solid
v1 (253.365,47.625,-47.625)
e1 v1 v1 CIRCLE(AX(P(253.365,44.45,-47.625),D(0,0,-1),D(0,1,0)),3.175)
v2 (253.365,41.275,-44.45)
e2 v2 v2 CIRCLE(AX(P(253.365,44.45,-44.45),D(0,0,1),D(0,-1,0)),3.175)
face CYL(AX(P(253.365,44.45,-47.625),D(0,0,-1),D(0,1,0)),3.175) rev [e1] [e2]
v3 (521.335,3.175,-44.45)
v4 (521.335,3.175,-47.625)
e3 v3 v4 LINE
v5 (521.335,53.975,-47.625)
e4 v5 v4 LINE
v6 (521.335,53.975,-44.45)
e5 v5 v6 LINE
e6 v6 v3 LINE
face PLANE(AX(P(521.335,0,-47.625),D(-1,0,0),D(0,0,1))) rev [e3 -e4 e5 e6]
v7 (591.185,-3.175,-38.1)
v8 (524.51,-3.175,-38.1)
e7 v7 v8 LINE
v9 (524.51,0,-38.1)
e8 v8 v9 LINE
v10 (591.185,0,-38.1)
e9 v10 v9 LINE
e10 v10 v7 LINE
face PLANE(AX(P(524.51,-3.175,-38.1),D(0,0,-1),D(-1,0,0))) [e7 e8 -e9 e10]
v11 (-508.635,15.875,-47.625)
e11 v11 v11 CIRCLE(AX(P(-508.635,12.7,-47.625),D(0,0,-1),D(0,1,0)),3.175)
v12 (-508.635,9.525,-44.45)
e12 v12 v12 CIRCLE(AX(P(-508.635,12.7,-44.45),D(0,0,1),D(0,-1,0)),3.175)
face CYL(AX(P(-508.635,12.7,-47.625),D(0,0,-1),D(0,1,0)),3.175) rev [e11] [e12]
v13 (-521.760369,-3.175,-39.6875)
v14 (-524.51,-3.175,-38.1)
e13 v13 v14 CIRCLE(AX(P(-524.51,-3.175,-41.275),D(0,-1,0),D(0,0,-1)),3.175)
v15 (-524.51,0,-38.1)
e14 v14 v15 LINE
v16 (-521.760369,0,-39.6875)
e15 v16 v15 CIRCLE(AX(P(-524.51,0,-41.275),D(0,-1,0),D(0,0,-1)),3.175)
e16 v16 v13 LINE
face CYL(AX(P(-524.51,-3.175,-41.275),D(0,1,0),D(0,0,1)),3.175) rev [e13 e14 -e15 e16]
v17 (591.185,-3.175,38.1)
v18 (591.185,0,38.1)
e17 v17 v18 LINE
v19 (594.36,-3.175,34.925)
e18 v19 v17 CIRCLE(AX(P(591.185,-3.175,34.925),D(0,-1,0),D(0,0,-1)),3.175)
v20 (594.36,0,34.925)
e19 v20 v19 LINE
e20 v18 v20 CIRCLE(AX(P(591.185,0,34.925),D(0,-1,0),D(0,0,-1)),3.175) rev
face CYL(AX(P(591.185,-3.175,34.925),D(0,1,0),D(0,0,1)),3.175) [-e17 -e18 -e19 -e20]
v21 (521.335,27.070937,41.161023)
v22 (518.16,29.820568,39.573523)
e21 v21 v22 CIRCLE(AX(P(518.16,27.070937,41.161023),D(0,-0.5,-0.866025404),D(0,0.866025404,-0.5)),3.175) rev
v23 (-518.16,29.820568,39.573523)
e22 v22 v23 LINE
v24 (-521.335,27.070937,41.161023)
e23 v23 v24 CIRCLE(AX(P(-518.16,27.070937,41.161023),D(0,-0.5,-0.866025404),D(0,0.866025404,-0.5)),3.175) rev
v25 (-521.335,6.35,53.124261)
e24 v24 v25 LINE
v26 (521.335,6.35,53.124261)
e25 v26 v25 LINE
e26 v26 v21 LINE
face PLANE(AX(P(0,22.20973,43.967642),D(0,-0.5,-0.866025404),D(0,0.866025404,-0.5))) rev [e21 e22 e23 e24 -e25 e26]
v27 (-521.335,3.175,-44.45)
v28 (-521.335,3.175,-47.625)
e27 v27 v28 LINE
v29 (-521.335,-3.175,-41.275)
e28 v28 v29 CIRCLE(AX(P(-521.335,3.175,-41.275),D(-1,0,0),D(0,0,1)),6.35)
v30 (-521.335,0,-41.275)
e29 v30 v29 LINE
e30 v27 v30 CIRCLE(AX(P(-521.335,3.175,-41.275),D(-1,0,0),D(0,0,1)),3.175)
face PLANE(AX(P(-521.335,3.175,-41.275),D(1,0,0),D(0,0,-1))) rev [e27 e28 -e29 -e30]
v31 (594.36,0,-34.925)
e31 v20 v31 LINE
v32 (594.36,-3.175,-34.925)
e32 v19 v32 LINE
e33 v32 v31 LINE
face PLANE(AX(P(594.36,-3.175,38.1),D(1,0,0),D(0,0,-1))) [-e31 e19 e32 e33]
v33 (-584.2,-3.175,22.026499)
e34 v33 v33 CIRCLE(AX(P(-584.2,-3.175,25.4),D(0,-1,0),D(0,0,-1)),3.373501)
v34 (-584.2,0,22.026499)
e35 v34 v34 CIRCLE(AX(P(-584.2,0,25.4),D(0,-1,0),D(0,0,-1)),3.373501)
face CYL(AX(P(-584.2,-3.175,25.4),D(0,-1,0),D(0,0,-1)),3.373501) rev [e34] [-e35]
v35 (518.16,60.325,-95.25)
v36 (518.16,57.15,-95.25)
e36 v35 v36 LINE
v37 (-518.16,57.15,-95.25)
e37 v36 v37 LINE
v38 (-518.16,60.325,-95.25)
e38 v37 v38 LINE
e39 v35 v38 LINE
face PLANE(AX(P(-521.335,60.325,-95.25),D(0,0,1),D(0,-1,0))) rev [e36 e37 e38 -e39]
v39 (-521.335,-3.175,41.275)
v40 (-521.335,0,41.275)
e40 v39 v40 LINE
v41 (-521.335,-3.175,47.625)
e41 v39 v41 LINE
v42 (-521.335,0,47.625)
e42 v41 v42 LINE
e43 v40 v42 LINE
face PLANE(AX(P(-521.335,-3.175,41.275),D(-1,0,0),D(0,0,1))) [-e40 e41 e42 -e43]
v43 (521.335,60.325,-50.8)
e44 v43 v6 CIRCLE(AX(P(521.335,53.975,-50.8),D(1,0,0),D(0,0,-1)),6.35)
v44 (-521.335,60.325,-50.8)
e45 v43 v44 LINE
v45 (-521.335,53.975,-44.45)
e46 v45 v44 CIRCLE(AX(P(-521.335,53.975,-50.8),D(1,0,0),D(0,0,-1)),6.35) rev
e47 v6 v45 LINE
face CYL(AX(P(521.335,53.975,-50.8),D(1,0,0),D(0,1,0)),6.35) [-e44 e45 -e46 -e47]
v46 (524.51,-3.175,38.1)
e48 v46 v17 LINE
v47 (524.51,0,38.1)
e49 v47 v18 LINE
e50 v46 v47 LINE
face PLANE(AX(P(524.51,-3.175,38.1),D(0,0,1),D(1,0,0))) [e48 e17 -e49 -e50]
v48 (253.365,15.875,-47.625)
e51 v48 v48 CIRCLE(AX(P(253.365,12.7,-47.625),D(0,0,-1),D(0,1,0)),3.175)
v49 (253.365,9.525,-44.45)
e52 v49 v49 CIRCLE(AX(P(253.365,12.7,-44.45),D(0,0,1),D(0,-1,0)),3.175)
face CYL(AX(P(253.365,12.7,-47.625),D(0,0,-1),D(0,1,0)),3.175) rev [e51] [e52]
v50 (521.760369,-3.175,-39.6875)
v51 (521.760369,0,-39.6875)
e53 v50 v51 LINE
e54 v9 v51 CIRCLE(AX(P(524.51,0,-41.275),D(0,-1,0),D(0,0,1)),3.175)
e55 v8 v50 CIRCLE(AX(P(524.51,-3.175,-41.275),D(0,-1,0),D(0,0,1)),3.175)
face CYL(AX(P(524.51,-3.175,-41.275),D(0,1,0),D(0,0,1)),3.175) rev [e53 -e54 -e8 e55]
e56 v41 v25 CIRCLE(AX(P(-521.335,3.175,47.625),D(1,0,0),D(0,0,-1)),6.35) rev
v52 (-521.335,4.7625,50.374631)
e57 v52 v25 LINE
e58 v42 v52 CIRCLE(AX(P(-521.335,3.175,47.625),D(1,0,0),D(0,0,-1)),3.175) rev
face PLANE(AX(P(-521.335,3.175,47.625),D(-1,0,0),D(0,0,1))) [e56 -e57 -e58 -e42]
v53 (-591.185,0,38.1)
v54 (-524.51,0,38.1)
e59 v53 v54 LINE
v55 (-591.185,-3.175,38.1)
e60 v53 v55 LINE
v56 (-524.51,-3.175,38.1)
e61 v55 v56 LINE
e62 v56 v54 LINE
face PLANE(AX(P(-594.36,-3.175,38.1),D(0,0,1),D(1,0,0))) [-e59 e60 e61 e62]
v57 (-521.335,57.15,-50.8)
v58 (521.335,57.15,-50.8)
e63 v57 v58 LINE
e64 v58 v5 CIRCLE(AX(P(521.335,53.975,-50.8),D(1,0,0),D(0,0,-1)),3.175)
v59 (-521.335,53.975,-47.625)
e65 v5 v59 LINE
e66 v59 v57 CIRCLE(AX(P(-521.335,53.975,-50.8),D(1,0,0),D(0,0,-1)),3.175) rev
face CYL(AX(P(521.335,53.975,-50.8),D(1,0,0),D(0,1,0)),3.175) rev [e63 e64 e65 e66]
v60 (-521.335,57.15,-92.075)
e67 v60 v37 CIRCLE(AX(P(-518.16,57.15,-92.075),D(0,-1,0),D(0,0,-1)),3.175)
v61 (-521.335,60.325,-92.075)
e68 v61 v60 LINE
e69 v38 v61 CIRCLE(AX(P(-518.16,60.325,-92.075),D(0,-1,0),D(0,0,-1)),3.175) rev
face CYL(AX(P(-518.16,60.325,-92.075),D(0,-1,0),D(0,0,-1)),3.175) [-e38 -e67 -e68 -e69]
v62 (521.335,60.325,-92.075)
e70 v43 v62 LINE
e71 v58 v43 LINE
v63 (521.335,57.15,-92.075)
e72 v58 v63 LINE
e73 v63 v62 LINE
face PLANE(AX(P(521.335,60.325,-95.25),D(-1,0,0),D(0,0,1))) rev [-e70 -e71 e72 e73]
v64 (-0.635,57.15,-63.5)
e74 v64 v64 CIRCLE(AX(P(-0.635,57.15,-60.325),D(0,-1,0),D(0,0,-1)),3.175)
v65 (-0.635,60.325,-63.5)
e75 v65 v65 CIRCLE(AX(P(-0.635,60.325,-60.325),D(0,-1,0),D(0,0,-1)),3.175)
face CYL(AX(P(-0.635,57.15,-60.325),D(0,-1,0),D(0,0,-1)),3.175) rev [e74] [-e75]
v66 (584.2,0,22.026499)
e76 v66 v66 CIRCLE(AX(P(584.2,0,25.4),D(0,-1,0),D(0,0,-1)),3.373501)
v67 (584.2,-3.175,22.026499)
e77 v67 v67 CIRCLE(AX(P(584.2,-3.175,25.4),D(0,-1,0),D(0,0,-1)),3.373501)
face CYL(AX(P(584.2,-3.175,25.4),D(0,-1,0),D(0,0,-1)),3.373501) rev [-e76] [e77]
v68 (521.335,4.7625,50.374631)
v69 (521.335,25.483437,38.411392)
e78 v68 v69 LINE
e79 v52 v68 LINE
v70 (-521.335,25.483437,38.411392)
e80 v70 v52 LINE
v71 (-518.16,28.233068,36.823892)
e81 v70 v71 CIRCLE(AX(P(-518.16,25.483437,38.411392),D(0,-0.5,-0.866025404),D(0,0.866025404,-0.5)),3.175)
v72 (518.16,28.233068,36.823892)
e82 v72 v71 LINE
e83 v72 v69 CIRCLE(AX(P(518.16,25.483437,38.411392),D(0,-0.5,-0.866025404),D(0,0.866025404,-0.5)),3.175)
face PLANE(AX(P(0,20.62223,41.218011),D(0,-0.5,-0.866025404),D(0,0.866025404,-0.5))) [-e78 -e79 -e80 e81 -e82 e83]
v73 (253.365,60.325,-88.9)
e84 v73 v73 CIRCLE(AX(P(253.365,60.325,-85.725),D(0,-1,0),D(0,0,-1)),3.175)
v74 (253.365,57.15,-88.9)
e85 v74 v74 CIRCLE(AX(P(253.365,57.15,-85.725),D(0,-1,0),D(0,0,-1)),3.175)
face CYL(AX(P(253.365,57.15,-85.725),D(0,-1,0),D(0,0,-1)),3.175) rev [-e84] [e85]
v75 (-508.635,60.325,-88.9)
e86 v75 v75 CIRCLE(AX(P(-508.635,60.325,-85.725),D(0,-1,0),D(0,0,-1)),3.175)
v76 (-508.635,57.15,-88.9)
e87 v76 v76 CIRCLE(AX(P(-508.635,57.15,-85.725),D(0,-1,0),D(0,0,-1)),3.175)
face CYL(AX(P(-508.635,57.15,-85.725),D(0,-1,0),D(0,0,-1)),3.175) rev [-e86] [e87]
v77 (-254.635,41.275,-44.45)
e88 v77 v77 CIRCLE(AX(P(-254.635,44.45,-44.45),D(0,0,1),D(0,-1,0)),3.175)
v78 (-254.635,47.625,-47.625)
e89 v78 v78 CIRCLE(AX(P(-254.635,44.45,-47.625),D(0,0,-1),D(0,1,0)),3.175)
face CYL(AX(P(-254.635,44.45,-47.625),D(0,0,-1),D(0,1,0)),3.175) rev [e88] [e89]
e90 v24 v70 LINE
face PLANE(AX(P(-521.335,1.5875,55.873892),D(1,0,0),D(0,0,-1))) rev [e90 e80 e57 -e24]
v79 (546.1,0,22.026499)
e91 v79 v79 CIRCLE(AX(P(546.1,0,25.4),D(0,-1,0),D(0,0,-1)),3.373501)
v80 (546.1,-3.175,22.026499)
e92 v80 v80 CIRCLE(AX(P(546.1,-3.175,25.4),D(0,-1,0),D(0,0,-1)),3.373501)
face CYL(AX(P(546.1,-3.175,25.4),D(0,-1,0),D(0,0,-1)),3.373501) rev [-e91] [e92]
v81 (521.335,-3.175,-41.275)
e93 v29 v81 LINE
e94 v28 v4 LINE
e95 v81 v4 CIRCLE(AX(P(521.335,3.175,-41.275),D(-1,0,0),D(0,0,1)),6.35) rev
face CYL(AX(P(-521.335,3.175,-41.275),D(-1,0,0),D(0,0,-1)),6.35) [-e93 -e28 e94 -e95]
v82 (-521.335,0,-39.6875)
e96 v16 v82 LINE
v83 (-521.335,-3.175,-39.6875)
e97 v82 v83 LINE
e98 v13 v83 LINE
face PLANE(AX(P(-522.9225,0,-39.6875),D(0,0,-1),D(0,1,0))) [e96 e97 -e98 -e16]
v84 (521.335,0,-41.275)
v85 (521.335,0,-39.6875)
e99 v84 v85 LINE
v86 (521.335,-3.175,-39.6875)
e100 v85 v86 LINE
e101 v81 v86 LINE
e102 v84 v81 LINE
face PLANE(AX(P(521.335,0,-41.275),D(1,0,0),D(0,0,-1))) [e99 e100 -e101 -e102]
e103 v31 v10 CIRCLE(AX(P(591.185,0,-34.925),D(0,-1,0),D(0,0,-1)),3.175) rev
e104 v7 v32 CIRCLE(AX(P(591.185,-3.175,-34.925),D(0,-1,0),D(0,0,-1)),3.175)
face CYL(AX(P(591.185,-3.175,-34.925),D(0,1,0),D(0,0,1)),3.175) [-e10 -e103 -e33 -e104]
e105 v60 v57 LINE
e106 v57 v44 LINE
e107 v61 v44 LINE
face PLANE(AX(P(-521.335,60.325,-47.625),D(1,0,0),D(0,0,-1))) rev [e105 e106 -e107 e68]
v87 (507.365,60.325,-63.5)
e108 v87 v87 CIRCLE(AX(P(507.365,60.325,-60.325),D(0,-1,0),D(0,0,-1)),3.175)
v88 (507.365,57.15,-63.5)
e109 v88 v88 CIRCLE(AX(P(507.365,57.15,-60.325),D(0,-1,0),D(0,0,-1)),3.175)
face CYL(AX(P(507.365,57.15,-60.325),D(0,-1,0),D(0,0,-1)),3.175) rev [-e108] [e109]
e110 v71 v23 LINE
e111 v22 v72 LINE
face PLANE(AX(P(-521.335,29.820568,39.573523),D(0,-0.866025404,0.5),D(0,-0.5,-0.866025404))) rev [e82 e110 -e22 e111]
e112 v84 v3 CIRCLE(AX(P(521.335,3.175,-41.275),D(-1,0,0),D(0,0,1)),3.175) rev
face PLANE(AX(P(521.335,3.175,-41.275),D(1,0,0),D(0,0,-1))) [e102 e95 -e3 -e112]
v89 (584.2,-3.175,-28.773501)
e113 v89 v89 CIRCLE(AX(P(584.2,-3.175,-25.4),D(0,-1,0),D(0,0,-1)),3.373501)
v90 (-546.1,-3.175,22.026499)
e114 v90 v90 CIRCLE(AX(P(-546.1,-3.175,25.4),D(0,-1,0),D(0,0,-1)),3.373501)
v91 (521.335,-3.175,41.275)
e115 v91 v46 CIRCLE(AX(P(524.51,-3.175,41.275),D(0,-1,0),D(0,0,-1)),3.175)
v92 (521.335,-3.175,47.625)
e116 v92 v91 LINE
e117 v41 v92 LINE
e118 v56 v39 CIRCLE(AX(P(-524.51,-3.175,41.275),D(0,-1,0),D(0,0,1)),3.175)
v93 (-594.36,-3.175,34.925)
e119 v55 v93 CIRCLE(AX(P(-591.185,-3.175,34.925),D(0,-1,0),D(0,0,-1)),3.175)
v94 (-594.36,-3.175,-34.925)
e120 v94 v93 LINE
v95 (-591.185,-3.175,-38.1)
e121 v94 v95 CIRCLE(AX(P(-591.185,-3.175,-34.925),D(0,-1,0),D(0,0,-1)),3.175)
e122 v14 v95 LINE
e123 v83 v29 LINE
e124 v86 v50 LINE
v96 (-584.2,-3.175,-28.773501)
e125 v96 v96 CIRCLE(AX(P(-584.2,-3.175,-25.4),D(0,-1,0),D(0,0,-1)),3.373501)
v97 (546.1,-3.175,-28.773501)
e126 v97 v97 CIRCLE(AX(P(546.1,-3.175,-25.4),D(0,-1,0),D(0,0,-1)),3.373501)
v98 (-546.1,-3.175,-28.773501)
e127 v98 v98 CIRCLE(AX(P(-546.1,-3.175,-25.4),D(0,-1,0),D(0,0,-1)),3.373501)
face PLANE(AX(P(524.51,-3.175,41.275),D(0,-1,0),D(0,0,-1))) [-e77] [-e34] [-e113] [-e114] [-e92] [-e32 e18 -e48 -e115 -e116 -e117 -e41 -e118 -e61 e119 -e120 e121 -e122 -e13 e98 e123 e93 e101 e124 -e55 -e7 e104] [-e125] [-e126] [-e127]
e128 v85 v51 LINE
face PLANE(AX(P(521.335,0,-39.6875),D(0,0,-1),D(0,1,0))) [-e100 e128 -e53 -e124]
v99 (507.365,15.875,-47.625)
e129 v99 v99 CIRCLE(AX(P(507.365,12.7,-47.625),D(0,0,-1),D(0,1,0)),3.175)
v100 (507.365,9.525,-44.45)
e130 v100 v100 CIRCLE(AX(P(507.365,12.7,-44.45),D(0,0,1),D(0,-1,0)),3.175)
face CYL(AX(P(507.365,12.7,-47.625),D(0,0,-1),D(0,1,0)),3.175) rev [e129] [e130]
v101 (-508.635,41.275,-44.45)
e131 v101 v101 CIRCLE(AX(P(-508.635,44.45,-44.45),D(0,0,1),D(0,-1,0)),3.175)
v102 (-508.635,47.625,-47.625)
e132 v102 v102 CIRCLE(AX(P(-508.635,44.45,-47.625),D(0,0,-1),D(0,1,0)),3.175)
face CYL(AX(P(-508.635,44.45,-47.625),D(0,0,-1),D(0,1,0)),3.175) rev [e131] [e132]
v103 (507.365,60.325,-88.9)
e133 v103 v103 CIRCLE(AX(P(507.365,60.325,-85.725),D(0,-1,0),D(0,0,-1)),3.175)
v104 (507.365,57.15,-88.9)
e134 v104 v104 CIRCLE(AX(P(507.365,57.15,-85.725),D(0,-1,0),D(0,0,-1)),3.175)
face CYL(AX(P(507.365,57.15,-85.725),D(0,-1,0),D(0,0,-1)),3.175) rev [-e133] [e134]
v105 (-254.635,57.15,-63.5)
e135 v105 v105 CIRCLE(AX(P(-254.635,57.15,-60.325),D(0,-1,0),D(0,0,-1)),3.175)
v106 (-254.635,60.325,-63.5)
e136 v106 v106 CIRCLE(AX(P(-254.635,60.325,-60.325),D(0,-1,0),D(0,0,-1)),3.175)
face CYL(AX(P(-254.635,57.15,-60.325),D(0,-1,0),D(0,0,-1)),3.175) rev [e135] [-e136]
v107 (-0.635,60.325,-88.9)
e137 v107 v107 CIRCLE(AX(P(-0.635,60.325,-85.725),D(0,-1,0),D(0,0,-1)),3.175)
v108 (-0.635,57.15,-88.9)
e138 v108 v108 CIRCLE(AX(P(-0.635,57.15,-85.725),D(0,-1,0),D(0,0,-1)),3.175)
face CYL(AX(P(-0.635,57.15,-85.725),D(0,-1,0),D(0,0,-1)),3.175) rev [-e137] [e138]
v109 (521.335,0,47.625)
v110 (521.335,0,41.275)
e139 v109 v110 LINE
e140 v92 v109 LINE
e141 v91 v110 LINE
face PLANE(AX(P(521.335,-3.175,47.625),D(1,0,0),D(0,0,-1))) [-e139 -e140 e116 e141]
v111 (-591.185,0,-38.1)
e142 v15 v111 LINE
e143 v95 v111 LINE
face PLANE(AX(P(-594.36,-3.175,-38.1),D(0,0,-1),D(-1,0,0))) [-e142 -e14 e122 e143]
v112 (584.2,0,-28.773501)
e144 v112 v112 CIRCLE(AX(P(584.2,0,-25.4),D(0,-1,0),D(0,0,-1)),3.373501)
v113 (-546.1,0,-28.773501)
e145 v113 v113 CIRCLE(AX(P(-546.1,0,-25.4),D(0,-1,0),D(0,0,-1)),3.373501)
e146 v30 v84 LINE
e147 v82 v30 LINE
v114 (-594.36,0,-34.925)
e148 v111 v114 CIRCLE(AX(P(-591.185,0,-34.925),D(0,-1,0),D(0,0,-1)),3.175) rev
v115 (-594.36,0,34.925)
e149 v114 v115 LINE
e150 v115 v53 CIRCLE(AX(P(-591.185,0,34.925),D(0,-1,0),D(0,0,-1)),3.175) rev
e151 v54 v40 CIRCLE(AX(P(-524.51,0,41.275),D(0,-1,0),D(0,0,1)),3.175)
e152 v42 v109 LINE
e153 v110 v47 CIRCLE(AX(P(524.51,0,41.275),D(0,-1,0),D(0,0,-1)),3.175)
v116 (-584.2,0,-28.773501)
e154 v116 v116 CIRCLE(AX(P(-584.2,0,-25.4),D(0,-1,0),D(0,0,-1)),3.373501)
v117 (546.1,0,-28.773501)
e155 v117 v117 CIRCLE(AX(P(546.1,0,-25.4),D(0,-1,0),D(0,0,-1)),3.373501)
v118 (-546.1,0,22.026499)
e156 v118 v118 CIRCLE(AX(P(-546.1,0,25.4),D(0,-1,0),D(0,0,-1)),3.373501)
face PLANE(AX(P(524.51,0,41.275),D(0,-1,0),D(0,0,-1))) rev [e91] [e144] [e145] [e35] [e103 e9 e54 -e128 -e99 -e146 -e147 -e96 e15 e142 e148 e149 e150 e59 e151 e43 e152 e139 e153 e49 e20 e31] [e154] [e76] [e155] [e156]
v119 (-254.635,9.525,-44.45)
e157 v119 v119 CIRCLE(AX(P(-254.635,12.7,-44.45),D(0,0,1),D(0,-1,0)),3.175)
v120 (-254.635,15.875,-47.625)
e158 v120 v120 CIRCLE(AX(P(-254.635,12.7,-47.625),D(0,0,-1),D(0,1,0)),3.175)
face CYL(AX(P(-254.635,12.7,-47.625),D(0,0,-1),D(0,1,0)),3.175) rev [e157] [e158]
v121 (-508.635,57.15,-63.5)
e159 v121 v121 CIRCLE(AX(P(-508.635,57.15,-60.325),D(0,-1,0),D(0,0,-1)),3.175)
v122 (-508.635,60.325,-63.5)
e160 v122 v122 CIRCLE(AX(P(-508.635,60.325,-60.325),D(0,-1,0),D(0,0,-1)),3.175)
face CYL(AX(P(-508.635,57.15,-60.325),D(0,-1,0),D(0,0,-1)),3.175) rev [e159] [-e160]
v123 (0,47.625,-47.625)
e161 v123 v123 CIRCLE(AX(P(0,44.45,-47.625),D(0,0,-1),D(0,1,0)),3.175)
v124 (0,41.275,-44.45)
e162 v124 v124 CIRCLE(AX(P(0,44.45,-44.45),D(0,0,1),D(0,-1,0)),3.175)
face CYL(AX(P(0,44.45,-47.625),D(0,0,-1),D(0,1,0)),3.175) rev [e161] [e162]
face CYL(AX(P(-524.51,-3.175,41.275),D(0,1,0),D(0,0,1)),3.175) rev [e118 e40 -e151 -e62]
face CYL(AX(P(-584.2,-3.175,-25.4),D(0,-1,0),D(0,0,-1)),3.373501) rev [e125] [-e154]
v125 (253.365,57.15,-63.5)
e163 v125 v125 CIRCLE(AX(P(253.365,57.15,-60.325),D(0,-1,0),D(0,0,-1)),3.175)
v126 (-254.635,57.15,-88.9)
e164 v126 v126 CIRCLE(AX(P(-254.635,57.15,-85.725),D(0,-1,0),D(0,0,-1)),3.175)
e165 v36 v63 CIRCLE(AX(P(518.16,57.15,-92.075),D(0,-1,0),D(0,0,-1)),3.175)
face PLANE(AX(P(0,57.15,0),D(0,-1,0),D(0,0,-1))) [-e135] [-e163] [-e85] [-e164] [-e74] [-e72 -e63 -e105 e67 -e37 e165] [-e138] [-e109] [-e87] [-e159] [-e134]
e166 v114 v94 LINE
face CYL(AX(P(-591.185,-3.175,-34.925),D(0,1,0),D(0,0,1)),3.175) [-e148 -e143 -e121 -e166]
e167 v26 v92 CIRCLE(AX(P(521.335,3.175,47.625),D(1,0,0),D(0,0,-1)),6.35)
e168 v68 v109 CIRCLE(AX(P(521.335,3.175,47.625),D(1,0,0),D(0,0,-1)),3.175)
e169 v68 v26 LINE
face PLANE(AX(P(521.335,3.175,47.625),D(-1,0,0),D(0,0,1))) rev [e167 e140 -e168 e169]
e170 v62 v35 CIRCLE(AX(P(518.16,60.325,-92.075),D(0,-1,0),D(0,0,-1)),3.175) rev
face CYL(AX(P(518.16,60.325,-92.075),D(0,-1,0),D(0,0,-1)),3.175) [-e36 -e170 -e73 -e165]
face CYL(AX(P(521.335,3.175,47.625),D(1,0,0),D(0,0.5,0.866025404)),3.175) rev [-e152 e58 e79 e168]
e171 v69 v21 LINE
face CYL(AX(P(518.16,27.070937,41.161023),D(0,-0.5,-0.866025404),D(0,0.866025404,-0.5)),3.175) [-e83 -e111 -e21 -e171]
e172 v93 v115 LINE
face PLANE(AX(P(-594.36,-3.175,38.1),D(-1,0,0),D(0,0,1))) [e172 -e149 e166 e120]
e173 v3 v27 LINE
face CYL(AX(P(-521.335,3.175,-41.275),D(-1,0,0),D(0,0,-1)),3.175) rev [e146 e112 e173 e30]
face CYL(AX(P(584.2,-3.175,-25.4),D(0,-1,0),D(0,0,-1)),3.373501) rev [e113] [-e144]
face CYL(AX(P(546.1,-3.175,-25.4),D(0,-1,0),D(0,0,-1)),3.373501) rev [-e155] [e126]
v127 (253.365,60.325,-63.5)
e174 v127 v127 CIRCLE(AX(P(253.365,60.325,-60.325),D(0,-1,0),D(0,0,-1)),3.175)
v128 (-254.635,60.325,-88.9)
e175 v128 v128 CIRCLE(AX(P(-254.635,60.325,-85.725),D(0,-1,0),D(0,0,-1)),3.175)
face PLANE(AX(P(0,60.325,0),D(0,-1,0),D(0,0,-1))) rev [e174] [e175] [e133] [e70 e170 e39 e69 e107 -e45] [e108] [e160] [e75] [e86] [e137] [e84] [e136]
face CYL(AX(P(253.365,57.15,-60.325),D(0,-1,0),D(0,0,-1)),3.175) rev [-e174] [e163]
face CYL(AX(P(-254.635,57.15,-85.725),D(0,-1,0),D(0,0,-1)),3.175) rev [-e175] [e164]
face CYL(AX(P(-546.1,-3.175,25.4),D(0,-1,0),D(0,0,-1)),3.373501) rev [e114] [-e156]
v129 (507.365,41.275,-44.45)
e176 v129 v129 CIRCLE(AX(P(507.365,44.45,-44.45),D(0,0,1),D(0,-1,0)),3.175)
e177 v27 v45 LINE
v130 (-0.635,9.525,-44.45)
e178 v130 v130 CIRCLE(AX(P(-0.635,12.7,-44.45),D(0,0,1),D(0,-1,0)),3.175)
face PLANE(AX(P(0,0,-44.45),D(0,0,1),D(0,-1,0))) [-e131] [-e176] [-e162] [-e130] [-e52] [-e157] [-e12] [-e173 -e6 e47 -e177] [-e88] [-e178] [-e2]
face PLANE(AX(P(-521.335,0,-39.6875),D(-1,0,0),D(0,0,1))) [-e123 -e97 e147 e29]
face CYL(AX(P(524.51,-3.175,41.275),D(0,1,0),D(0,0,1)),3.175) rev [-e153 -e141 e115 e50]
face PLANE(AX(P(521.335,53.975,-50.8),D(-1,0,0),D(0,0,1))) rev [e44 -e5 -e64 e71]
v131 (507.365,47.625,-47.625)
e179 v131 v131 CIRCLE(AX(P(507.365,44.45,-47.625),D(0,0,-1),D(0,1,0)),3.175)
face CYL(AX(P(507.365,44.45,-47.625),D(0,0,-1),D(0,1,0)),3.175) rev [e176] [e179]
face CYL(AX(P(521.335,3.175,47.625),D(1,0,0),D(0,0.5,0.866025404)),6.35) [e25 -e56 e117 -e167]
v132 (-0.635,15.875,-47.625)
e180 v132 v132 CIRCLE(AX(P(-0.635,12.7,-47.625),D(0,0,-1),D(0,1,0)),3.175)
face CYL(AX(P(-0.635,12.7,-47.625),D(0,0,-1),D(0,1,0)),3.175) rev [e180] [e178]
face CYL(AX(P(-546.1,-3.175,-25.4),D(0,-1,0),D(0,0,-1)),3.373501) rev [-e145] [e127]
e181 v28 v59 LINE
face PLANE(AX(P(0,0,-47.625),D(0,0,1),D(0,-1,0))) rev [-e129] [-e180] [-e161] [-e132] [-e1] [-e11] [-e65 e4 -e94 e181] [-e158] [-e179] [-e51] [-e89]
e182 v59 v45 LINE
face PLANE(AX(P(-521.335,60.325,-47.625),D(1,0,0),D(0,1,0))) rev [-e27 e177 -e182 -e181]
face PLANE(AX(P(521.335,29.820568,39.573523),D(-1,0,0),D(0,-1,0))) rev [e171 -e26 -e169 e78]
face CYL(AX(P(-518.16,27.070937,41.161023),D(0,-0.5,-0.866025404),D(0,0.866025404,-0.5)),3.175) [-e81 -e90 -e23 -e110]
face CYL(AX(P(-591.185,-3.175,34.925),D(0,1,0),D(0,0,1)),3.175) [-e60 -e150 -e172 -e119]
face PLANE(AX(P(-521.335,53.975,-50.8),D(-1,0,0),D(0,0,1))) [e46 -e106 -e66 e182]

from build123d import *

# Parameters (mm, degrees)
BASE_FLANGE1_DEPTH               = 3.175
EDGE_FLANGE1_START               = -521.335
EDGE_FLANGE1_DEPTH               = 1042.67
EDGE_FLANGE1_START_2             = -521.760369343
EDGE_FLANGE1_2_DEPTH             = 0.425369343
EDGE_FLANGE1_START_3             = 521.335
EDGE_FLANGE1_3_DEPTH             = 0.425369343
EDGE_FLANGE1_4_DEPTH             = 1042.67
EDGE_FLANGE2_DEPTH               = 1042.67
EDGE_FLANGE3_STRIP_W             = 19.05
EDGE_FLANGE3_STRIP_H             = 3.175
EDGE_FLANGE3_STRIP_CUT_DEPTH     = 1042.67
EDGE_FLANGE3_DEPTH               = 1042.67
FILLET1_R                        = 3.175
F_17_64_0_26563_DIAMETER_HOLE1_D = 6.747002
F_1_4_0_25_DIAMETER_HOLE1_D      = 6.35
F_1_4_0_25_DIAMETER_HOLE2_D      = 6.35
F_1_4_0_25_DIAMETER_HOLE2_DEPTH  = 3.175


# Read off the part's stored shape, not the designer's step: Edge-Flange1
# Sheet-metal steps are written as plain solids
with BuildPart() as part:
    # Sketch1 → Base-Flange1 (new body)
    with BuildSketch(Plane(origin=(0, 0, 0), x_dir=(1, 0, 0), z_dir=(0, 1, 0))):
        with BuildLine():
            Line((-521.335, 41.275), (-521.335, 47.625))
            Line((-521.335, 47.625), (521.335, 47.625))
            Line((521.335, 47.625), (521.335, 41.275))
            ThreePointArc((521.335, 41.275), (522.26493597, 39.02993597), (524.51, 38.1))
            Line((524.51, 38.1), (594.36, 38.1))
            Line((594.36, 38.1), (594.36, -38.1))
            Line((594.36, -38.1), (524.51, -38.1))
            ThreePointArc((524.51, -38.1), (522.26493597, -39.02993597), (521.335, -41.275))
            Line((521.335, -41.275), (521.335, -47.625))
            Line((521.335, -47.625), (-521.335, -47.625))
            Line((-521.335, -47.625), (-521.335, -41.275))
            ThreePointArc((-521.335, -41.275), (-522.26493597, -39.02993597), (-524.51, -38.1))
            Line((-524.51, -38.1), (-594.36, -38.1))
            Line((-594.36, -38.1), (-594.36, 38.1))
            Line((-594.36, 38.1), (-524.51, 38.1))
            ThreePointArc((-524.51, 38.1), (-522.26493597, 39.02993597), (-521.335, 41.275))
        make_face()
    extrude(amount=-BASE_FLANGE1_DEPTH)

    # Edge-Flange1 outline → Edge-Flange1 (cut)
    with BuildSketch(Plane.YZ.offset(EDGE_FLANGE1_START)):
        with BuildLine():
            ThreePointArc((0, -46.774261315), (-2.324261314, -44.450000001), (-3.175, -41.275))
            Line((-3.175, -41.275), (-3.175, -47.625))
            Line((-3.175, -47.625), (0, -47.625))
            Line((0, -47.625), (0, -46.774261315))
        make_face()
    extrude(amount=EDGE_FLANGE1_DEPTH, mode=Mode.SUBTRACT)

    # Edge-Flange1 2 outline → Edge-Flange1 2 (cut)
    with BuildSketch(Plane.YZ.offset(EDGE_FLANGE1_START_2)):
        with BuildLine():
            Line((0, -39.6875), (-3.175, -39.6875))
            Line((-3.175, -39.6875), (-3.175, -41.275))
            ThreePointArc((-3.175, -41.275), (-2.324261314, -44.450000001), (0, -46.774261315))
            Line((0, -46.774261315), (0, -39.6875))
        make_face()
    extrude(amount=EDGE_FLANGE1_2_DEPTH, mode=Mode.SUBTRACT)

    # Edge-Flange1 3 outline → Edge-Flange1 3 (cut)
    with BuildSketch(Plane.YZ.offset(EDGE_FLANGE1_START_3)):
        with BuildLine():
            Line((0, -39.6875), (-3.175, -39.6875))
            Line((-3.175, -39.6875), (-3.175, -41.275))
            ThreePointArc((-3.175, -41.275), (-2.324261314, -44.450000001), (0, -46.774261315))
            Line((0, -46.774261315), (0, -39.6875))
        make_face()
    extrude(amount=EDGE_FLANGE1_3_DEPTH, mode=Mode.SUBTRACT)

    # Edge-Flange1 4 outline → Edge-Flange1 4 (add)
    with BuildSketch(Plane.YZ.offset(EDGE_FLANGE1_START)):
        with BuildLine():
            ThreePointArc((3.175, -44.45), (0.92993597, -43.52006403), (0, -41.275))
            Line((0, -41.275), (0, -46.774261315))
            ThreePointArc((0, -46.774261315), (1.531499064, -47.408628997), (3.175, -47.625))
            Line((3.175, -47.625), (60.325, -47.625))
            Line((60.325, -47.625), (60.325, -44.45))
            Line((60.325, -44.45), (3.175, -44.45))
        make_face()
    extrude(amount=EDGE_FLANGE1_4_DEPTH)

    # Edge-Flange2 section (across the edge) → Edge-Flange2 (add)
    with BuildSketch(Plane(origin=(-521.335, 0, 53.124261314), x_dir=(0, -0.499999999999998, -0.8660254037844398), z_dir=(1, 0, 0))):
        with BuildLine():
            Line((-3.175, 5.499261314), (-3.175, 32.600738686))
            Line((-3.175, 32.600738686), (0, 32.600738686))
            Line((0, 32.600738686), (0, 5.499261314))
            ThreePointArc((0, 5.499261314), (1.5875, 2.749630657), (4.7625, 2.749630657))
            Line((4.7625, 2.749630657), (6.35, 0))
            ThreePointArc((6.35, 0), (0, 0), (-3.175, 5.499261314))
        make_face()
    extrude(amount=EDGE_FLANGE2_DEPTH)

    # Edge-Flange3 strip (across the edge) → Edge-Flange3 strip cut (cut)
    with BuildSketch(Plane(origin=(-521.335, 60.325, -47.625), x_dir=(0, -1, 0), z_dir=(1, 0, 0))):
        with Locations((-3.175, -1.5875)):
            Rectangle(EDGE_FLANGE3_STRIP_W, EDGE_FLANGE3_STRIP_H)
    extrude(amount=EDGE_FLANGE3_STRIP_CUT_DEPTH, mode=Mode.SUBTRACT)

    # Edge-Flange3 section (across the edge) → Edge-Flange3 (add)
    with BuildSketch(Plane(origin=(-521.335, 60.325, -47.625), x_dir=(0, -1, 0), z_dir=(1, 0, 0))):
        with BuildLine():
            Line((0, 3.175), (0, 47.625))
            Line((0, 47.625), (3.175, 47.625))
            Line((3.175, 47.625), (3.175, 3.175))
            ThreePointArc((3.175, 3.175), (4.10493597, 0.92993597), (6.35, 0))
            Line((6.35, 0), (6.35, -3.175))
            ThreePointArc((6.35, -3.175), (1.859871939, -1.315128061), (0, 3.175))
        make_face()
    extrude(amount=EDGE_FLANGE3_DEPTH)

    # Fillet1
    fillet1_edges = [part.edges().sort_by_distance(p)[0] for p in [
        (-521.335, 29.026817884, 38.1987073),
        (521.335, 29.026817884, 38.1987073),
        (-521.335, 58.7375, -95.25),
        (521.335, 58.7375, -95.25),
        (594.36, -1.5875, -38.1),
        (594.36, -1.5875, 38.1),
        (-594.36, -1.5875, 38.1),
        (-594.36, -1.5875, -38.1),
    ]]
    fillet(fillet1_edges, radius=FILLET1_R)

    # 17/64 (0.26563) Diameter Hole1 (through all)
    with Locations(Plane(origin=(0, -3.175, 0), x_dir=(-1, 0, 0), z_dir=(0, -1, 0))):
        with Locations((-546.1, 25.4), (-584.2, 25.4), (-584.2, -25.4), (-546.1, -25.4), (546.1, 25.4), (584.2, 25.4), (584.2, -25.4), (546.1, -25.4)):
            Hole(F_17_64_0_26563_DIAMETER_HOLE1_D / 2)

    # 1/4 (0.25) Diameter Hole1 (through all)
    with Locations(Plane(origin=(0, 57.15, 0), x_dir=(-1, 0, 0), z_dir=(0, -1, 0))):
        with Locations((-507.365, 85.725), (-507.365, 60.325), (-253.365, 85.725), (-253.365, 60.325), (0.635, 85.725), (0.635, 60.325), (254.635, 85.725), (254.635, 60.325), (508.635, 85.725), (508.635, 60.325)):
            Hole(F_1_4_0_25_DIAMETER_HOLE1_D / 2)

    # 1/4 (0.25) Diameter Hole2
    with Locations(Plane(origin=(0, 0, -47.625), x_dir=(-1, 0, 0), z_dir=(0, 0, -1))):
        with Locations((508.635, 44.45), (508.635, 12.7), (254.635, 44.45), (254.635, 12.7), (0, 44.45), (0.635, 12.7), (-253.365, 44.45), (-253.365, 12.7), (-507.365, 44.45), (-507.365, 12.7)):
            Hole(F_1_4_0_25_DIAMETER_HOLE2_D / 2, depth=F_1_4_0_25_DIAMETER_HOLE2_DEPTH)


solid = part.part
